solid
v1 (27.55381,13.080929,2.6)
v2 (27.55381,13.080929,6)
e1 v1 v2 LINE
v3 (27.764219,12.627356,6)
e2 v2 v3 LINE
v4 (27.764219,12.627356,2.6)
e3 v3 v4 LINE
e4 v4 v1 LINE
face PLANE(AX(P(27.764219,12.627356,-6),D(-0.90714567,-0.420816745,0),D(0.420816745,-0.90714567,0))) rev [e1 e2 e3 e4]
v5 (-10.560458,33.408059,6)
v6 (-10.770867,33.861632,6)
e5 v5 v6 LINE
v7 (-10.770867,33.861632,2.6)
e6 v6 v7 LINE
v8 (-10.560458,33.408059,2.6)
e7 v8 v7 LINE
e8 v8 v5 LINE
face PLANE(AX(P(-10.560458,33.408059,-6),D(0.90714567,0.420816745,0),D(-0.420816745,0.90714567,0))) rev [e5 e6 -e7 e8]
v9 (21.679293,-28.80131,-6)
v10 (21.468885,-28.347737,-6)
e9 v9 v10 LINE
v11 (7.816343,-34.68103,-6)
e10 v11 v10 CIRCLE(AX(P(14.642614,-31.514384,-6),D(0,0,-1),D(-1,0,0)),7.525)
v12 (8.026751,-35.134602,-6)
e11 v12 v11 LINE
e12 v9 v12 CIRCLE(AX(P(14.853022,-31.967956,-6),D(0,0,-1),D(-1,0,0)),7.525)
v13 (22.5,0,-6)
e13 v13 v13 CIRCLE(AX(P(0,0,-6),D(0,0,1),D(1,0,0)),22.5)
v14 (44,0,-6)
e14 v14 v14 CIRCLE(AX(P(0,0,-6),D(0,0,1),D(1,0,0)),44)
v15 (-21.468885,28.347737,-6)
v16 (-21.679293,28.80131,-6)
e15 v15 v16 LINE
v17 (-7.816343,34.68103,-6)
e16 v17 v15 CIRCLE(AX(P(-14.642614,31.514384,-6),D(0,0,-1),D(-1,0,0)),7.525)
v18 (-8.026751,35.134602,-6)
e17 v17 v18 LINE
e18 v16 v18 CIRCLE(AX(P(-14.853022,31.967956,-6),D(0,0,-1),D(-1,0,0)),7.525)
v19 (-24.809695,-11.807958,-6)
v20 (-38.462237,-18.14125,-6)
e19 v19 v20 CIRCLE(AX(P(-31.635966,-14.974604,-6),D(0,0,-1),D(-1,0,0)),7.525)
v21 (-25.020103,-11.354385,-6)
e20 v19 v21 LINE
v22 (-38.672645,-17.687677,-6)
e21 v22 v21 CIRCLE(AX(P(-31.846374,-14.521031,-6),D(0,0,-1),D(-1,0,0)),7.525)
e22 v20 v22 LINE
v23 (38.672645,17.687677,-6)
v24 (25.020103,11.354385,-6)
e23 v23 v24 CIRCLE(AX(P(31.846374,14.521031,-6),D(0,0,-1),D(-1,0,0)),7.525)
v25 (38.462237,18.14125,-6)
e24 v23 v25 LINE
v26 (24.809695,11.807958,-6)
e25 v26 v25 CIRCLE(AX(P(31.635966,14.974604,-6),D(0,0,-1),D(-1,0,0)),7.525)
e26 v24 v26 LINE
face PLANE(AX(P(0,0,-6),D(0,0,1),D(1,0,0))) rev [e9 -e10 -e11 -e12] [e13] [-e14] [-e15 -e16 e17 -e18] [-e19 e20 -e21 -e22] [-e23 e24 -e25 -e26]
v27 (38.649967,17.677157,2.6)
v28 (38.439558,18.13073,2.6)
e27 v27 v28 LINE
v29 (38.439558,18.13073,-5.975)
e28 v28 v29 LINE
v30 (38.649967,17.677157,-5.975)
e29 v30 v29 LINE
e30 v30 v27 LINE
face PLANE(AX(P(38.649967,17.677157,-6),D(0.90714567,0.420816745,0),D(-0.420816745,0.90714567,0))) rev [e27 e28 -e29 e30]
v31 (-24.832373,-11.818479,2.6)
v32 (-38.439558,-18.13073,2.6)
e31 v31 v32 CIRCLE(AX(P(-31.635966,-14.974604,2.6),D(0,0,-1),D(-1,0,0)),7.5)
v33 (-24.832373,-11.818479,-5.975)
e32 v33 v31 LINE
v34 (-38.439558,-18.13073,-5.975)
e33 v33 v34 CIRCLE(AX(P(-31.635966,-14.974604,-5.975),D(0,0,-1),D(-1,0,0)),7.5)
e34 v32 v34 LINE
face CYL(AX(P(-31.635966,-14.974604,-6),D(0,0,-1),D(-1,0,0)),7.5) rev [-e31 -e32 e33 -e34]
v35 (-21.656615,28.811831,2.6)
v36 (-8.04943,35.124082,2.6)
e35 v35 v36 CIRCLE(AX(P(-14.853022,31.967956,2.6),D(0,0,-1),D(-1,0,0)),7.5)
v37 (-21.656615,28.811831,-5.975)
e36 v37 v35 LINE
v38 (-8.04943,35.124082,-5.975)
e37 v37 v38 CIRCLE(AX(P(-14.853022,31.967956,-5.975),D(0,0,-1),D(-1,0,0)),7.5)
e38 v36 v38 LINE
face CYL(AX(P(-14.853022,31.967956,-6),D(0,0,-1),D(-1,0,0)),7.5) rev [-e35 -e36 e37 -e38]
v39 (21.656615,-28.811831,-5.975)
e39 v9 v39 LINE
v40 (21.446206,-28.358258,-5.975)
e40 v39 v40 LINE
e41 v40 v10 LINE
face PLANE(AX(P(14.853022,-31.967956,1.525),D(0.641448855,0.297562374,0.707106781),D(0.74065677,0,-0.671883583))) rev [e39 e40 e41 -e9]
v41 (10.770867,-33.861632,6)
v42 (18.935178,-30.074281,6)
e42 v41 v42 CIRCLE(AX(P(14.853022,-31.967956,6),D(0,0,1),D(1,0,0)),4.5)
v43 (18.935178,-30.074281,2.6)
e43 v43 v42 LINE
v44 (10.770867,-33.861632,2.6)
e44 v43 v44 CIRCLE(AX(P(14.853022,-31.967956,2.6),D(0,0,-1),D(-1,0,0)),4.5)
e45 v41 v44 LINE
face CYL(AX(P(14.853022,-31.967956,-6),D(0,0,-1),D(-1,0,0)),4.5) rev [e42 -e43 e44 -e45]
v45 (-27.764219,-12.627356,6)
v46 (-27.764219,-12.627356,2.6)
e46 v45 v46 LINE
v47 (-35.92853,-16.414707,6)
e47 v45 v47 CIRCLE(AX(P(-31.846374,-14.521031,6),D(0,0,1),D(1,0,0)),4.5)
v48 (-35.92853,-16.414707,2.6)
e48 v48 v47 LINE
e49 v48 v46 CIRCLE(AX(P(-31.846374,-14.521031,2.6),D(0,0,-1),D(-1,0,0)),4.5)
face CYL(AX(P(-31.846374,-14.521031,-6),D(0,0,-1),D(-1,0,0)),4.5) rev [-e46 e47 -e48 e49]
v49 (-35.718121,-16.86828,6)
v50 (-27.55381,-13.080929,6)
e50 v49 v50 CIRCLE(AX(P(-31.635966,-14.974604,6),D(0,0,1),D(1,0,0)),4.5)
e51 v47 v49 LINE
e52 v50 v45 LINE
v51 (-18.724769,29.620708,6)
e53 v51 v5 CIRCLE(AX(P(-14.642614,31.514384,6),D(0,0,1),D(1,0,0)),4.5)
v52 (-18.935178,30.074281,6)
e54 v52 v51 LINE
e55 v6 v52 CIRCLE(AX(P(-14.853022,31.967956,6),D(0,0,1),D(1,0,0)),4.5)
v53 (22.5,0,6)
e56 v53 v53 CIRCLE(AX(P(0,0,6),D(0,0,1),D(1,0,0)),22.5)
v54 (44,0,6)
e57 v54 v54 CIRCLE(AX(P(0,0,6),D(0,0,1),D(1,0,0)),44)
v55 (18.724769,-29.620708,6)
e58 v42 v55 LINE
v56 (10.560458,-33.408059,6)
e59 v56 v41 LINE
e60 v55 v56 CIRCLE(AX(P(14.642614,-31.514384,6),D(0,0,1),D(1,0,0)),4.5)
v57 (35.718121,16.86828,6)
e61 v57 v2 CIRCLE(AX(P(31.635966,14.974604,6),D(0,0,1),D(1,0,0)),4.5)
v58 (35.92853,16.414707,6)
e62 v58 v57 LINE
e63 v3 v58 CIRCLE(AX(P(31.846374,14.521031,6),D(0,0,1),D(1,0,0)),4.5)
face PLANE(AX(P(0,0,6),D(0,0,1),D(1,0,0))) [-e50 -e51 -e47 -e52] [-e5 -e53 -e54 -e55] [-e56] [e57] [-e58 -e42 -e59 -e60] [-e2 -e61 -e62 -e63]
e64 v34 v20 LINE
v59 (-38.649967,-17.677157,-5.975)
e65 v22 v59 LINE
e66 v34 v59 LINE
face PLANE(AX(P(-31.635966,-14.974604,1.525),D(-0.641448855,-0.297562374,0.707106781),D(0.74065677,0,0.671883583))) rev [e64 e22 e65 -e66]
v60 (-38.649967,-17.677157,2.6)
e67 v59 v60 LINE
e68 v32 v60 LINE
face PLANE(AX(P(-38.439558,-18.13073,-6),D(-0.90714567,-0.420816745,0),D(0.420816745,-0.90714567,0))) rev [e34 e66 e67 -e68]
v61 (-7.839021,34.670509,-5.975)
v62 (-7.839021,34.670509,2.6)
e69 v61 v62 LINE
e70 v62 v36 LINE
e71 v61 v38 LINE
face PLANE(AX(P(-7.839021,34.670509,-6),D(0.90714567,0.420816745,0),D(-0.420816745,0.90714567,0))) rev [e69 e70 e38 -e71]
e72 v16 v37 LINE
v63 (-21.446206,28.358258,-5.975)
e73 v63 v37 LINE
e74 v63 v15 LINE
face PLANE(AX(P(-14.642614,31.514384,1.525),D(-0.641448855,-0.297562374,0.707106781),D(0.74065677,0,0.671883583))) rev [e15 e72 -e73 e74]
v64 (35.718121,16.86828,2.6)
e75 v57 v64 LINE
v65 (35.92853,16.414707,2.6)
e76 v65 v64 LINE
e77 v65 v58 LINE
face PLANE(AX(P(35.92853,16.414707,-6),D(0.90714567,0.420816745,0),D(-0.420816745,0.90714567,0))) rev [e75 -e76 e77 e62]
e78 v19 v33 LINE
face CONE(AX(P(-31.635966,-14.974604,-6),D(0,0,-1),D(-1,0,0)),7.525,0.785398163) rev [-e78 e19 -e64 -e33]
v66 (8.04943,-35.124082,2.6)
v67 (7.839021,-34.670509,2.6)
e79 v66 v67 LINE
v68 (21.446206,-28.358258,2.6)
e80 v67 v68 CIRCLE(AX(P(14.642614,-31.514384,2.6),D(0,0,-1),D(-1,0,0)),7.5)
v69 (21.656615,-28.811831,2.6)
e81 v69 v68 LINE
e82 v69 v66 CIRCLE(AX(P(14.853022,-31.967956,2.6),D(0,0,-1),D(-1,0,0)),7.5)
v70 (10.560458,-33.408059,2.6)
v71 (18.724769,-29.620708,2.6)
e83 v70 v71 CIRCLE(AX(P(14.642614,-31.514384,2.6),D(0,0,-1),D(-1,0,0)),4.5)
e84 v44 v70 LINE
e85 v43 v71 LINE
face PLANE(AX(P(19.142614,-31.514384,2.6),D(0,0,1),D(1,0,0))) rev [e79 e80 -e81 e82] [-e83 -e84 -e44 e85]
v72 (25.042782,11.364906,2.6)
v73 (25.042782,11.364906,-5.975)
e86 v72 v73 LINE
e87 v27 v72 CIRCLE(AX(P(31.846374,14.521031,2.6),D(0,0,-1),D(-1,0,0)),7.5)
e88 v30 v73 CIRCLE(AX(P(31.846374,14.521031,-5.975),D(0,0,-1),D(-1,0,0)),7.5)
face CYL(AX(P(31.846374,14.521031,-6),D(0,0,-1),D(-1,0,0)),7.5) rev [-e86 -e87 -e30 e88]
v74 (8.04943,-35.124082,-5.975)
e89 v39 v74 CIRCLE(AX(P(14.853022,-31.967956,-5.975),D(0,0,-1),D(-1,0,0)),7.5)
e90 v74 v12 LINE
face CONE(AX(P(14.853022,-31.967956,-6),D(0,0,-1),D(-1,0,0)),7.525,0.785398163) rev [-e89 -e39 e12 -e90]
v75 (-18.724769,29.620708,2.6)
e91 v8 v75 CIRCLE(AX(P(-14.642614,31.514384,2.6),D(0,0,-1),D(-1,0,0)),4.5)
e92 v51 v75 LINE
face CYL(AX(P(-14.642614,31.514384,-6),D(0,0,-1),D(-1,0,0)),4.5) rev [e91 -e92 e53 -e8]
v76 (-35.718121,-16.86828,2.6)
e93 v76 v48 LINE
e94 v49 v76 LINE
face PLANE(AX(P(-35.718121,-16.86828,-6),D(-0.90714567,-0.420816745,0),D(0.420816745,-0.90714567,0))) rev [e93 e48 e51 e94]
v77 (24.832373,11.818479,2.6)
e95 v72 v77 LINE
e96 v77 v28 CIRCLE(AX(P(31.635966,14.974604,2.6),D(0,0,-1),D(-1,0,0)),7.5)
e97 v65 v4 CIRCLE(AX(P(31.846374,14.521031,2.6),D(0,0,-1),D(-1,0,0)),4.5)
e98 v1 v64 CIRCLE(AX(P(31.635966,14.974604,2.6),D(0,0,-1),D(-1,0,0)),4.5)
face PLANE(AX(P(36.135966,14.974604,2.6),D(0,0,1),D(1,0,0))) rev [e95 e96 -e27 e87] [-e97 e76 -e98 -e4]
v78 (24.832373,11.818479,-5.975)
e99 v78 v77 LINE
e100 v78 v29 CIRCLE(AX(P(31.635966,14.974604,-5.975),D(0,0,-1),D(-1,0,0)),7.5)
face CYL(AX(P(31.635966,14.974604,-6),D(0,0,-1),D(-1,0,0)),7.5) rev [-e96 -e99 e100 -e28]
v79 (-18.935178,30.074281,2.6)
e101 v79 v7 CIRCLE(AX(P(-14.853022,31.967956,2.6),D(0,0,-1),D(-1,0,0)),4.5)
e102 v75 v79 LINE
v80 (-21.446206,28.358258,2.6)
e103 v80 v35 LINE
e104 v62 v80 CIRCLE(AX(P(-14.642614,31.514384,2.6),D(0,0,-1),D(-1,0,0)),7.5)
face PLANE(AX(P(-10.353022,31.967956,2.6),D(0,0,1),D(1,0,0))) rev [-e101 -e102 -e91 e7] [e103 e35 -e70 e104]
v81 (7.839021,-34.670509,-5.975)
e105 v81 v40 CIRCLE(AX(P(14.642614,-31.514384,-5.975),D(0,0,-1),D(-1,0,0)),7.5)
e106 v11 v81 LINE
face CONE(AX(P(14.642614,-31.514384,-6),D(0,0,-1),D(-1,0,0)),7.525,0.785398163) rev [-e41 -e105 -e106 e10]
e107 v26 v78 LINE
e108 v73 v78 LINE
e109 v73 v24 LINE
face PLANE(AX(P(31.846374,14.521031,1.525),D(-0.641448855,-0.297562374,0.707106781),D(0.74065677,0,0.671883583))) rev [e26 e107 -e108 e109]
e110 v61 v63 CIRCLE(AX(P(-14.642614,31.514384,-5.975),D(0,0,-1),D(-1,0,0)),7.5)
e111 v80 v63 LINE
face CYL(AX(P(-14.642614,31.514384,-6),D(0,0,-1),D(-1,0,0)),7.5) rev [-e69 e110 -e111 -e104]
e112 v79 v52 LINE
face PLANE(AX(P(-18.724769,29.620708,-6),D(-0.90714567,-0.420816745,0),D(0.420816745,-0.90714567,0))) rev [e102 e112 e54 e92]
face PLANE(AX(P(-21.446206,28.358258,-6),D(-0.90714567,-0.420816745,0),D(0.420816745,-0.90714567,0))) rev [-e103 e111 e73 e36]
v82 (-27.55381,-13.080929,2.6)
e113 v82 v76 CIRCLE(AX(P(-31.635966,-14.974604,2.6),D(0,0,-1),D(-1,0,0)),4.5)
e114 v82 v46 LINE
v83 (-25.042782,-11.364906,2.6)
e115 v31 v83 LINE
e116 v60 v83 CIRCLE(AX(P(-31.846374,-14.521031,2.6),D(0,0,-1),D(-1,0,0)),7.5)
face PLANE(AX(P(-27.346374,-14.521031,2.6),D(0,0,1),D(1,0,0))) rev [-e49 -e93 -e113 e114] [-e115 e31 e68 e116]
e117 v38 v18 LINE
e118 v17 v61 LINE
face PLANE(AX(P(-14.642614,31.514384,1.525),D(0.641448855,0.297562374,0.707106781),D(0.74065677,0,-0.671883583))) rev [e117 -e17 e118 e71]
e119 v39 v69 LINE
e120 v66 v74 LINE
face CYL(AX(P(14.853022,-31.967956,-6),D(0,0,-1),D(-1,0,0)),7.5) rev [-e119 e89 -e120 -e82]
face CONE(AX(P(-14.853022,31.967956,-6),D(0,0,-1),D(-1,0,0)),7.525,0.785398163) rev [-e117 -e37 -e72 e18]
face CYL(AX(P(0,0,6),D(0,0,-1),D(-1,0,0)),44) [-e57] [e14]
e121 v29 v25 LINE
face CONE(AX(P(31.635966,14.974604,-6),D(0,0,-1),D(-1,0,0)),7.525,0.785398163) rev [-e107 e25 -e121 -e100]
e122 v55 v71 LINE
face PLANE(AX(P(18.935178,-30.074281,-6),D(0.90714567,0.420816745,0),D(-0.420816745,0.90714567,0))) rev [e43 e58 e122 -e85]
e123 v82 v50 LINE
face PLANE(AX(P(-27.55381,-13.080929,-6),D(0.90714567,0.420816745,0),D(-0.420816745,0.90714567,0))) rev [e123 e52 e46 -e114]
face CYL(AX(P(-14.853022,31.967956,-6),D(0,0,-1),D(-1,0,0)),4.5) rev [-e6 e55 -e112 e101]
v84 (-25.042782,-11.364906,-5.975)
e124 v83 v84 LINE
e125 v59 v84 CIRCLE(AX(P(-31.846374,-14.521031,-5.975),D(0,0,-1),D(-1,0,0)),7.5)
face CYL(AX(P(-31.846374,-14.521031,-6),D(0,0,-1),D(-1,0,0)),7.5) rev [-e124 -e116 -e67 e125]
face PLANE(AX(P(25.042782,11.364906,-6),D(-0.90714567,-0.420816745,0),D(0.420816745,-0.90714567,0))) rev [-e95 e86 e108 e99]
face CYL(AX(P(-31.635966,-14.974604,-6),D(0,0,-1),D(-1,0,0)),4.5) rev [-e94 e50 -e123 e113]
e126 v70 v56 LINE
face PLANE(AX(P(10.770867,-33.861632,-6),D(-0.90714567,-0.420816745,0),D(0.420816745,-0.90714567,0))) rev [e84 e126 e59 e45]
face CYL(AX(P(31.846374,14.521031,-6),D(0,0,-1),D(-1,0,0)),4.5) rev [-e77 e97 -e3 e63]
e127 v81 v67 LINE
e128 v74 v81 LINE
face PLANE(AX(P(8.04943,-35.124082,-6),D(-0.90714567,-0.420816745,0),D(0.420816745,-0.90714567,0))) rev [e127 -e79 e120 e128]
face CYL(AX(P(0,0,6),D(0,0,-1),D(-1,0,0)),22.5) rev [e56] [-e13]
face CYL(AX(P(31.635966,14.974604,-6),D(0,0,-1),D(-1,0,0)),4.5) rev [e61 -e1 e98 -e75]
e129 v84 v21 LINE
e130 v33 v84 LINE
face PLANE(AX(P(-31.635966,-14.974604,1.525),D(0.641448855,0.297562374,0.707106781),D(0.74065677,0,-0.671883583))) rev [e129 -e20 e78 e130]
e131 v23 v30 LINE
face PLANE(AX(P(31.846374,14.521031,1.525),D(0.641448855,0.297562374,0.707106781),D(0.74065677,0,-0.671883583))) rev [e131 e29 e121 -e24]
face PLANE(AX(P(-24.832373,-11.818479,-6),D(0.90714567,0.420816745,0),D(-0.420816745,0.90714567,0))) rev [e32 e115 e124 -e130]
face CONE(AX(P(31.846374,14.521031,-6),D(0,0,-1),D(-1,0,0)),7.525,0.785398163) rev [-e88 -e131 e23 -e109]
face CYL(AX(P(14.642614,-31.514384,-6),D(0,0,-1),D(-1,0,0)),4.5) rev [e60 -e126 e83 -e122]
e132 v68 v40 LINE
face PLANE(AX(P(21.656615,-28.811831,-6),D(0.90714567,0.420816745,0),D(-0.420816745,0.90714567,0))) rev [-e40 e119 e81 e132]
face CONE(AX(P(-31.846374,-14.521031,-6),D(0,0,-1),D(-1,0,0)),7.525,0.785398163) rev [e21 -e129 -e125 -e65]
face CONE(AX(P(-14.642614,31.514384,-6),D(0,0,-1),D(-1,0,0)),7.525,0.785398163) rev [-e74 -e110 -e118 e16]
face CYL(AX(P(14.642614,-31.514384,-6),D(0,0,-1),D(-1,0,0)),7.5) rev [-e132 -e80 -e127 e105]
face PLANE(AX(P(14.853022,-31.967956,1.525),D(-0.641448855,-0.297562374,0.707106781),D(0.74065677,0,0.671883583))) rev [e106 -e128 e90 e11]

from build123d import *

# Parameters (mm, degrees)
SKETCH1_R                                      = 44
SKETCH1_R_2                                    = 22.5
BOSS_EXTRUDE1_DEPTH                            = 6
CBORE_START                                    = -6
CBORE_SLOT_FOR_M8_HEX_SOCKET_HEAD_CAP_SC_DEPTH = 8.6
CBORE_START_2                                  = 2.6
CBORE_SLOT_FOR_M8_HEX_SOCKET_HEAD_CA_3_DEPTH   = 3.4


with BuildPart() as part:
    # Sketch1 → Boss-Extrude1 (new, symmetric)
    with BuildSketch(Plane.XY):
        Circle(SKETCH1_R)
        Circle(SKETCH1_R_2, mode=Mode.SUBTRACT)
    extrude(amount=BOSS_EXTRUDE1_DEPTH, both=True)

    # CBORE SLOT for M8 Hex Socket Head Cap Screw1: read off the stored shape, not the designer's step
    # CBORE SLOT for M8 Hex Socket Head Ca 2 → CBORE SLOT for M8 Hex Socket Head Cap Screw1 (cut)
    with BuildSketch(Plane.XY.offset(CBORE_START)):
        with BuildLine():
            ThreePointArc((38.439558263, 18.130729877), (28.479840149, 21.778196819), (24.832373207, 11.818478705))
            Line((24.832373207, 11.818478705), (25.04278158, 11.36490587))
            ThreePointArc((25.04278158, 11.36490587), (35.002499693, 7.717438928), (38.649966636, 17.677157041))
            Line((38.649966636, 17.677157041), (38.439558263, 18.130729877))
        make_face()
        with BuildLine():
            ThreePointArc((21.446206215, -28.358257918), (11.486488101, -24.710790976), (7.839021159, -34.67050909))
            Line((7.839021159, -34.67050909), (8.049429531, -35.124081925))
            ThreePointArc((8.049429531, -35.124081925), (18.009147645, -38.771548867), (21.656614587, -28.811830753))
            Line((21.656614587, -28.811830753), (21.446206215, -28.358257918))
        make_face()
        with BuildLine():
            ThreePointArc((-25.04278158, -11.36490587), (-35.002499693, -7.717438928), (-38.649966636, -17.677157041))
            Line((-38.649966636, -17.677157041), (-38.439558263, -18.130729877))
            ThreePointArc((-38.439558263, -18.130729877), (-28.479840149, -21.778196819), (-24.832373207, -11.818478705))
            Line((-24.832373207, -11.818478705), (-25.04278158, -11.36490587))
        make_face()
        with BuildLine():
            ThreePointArc((-8.049429531, 35.124081925), (-18.009147645, 38.771548867), (-21.656614587, 28.811830753))
            Line((-21.656614587, 28.811830753), (-21.446206215, 28.358257918))
            ThreePointArc((-21.446206215, 28.358257918), (-11.486488101, 24.710790976), (-7.839021159, 34.67050909))
            Line((-7.839021159, 34.67050909), (-8.049429531, 35.124081925))
        make_face()
    extrude(amount=CBORE_SLOT_FOR_M8_HEX_SOCKET_HEAD_CAP_SC_DEPTH, mode=Mode.SUBTRACT)

    # CBORE SLOT for M8 Hex Socket Head Ca 3 o → CBORE SLOT for M8 Hex Socket Head Ca 3 (cut)
    with BuildSketch(Plane.XY.offset(CBORE_START_2)):
        with BuildLine():
            ThreePointArc((35.718121252, 16.868279642), (29.742290383, 19.056759808), (27.553810218, 13.080928939))
            Line((27.553810218, 13.080928939), (27.764218591, 12.627356104))
            ThreePointArc((27.764218591, 12.627356104), (33.740049459, 10.438875939), (35.928529624, 16.414706807))
            Line((35.928529624, 16.414706807), (35.718121252, 16.868279642))
        make_face()
        with BuildLine():
            ThreePointArc((18.724769204, -29.620708152), (12.748938336, -27.432227987), (10.56045817, -33.408058855))
            Line((10.56045817, -33.408058855), (10.770866543, -33.86163169))
            ThreePointArc((10.770866543, -33.86163169), (16.746697411, -36.050111856), (18.935177576, -30.074280987))
            Line((18.935177576, -30.074280987), (18.724769204, -29.620708152))
        make_face()
        with BuildLine():
            ThreePointArc((-27.764218591, -12.627356104), (-33.740049459, -10.438875939), (-35.928529624, -16.414706807))
            Line((-35.928529624, -16.414706807), (-35.718121252, -16.868279642))
            ThreePointArc((-35.718121252, -16.868279642), (-29.742290383, -19.056759808), (-27.553810218, -13.080928939))
            Line((-27.553810218, -13.080928939), (-27.764218591, -12.627356104))
        make_face()
        with BuildLine():
            ThreePointArc((-10.770866543, 33.86163169), (-16.746697411, 36.050111856), (-18.935177576, 30.074280987))
            Line((-18.935177576, 30.074280987), (-18.724769204, 29.620708152))
            ThreePointArc((-18.724769204, 29.620708152), (-12.748938336, 27.432227987), (-10.56045817, 33.408058855))
            Line((-10.56045817, 33.408058855), (-10.770866543, 33.86163169))
        make_face()
    extrude(amount=CBORE_SLOT_FOR_M8_HEX_SOCKET_HEAD_CA_3_DEPTH, mode=Mode.SUBTRACT)

    # CBORE SLOT for M8 Hex Socket Head Ca 4: loft between two sections, ruled curve by curve
    cbore_slot_for_m8_hex_socket_head_ca_4_from = [
        Edge.make_three_point_arc((24.832373207, 11.818478705, -5.975), (24.593381518, 17.5537529, -5.975), (28.479840149, 21.778196819, -5.975)),
        Edge.make_three_point_arc((28.479840149, 21.778196819, -5.975), (34.215114344, 22.017188508, -5.975), (38.439558263, 18.130729877, -5.975)),
        Edge.make_three_point_arc((38.649966636, 17.677157041, -5.975), (38.888958324, 11.941882847, -5.975), (35.002499693, 7.717438928, -5.975)),
        Edge.make_three_point_arc((35.002499693, 7.717438928, -5.975), (29.267225499, 7.478447239, -5.975), (25.04278158, 11.36490587, -5.975)),
        Edge.make_line((38.439558263, 18.130729877, -5.975), (38.649966636, 17.677157041, -5.975)),
        Edge.make_line((24.832373207, 11.818478705, -5.975), (25.04278158, 11.36490587, -5.975)),
    ]
    cbore_slot_for_m8_hex_socket_head_ca_4_to = [
        Edge.make_three_point_arc((24.809694565, 11.807958286, -6), (24.569906238, 17.562350062, -6), (28.469319731, 21.800875461, -6)),
        Edge.make_three_point_arc((28.469319731, 21.800875461, -6), (34.223711506, 22.040663789, -6), (38.462236905, 18.141250295, -6)),
        Edge.make_three_point_arc((38.672645277, 17.68767746, -6), (38.912433605, 11.933285685, -6), (35.013020112, 7.694760286, -6)),
        Edge.make_three_point_arc((35.013020112, 7.694760286, -6), (29.258628337, 7.454971958, -6), (25.020102938, 11.354385451, -6)),
        Edge.make_line((38.462236905, 18.141250295, -6), (38.672645277, 17.68767746, -6)),
        Edge.make_line((24.809694565, 11.807958286, -6), (25.020102938, 11.354385451, -6)),
    ]
    cbore_slot_for_m8_hex_socket_head_ca_4 = Solid(Shell([*[Face.make_surface_from_curves(cbore_slot_for_m8_hex_socket_head_ca_4_from[k], cbore_slot_for_m8_hex_socket_head_ca_4_to[k]) for k in range(6)], Face(Wire(cbore_slot_for_m8_hex_socket_head_ca_4_from)), Face(Wire(cbore_slot_for_m8_hex_socket_head_ca_4_to))]))
    add(cbore_slot_for_m8_hex_socket_head_ca_4, mode=Mode.SUBTRACT)

    # CBORE SLOT for M8 Hex Socket Head Ca 5: loft between two sections, ruled curve by curve
    cbore_slot_for_m8_hex_socket_head_ca_5_from = [
        Edge.make_three_point_arc((7.839021159, -34.67050909, -5.975), (7.60002947, -28.935234895, -5.975), (11.486488101, -24.710790976, -5.975)),
        Edge.make_three_point_arc((11.486488101, -24.710790976, -5.975), (17.221762296, -24.471799287, -5.975), (21.446206215, -28.358257918, -5.975)),
        Edge.make_three_point_arc((21.656614587, -28.811830753, -5.975), (21.895606276, -34.547104948, -5.975), (18.009147645, -38.771548867, -5.975)),
        Edge.make_three_point_arc((18.009147645, -38.771548867, -5.975), (12.27387345, -39.010540556, -5.975), (8.049429531, -35.124081925, -5.975)),
        Edge.make_line((21.446206215, -28.358257918, -5.975), (21.656614587, -28.811830753, -5.975)),
        Edge.make_line((7.839021159, -34.67050909, -5.975), (8.049429531, -35.124081925, -5.975)),
    ]
    cbore_slot_for_m8_hex_socket_head_ca_5_to = [
        Edge.make_three_point_arc((7.816342517, -34.681029508, -6), (7.576554189, -28.926637733, -6), (11.475967683, -24.688112334, -6)),
        Edge.make_three_point_arc((11.475967683, -24.688112334, -6), (17.230359458, -24.448324006, -6), (21.468884857, -28.347737499, -6)),
        Edge.make_three_point_arc((21.679293229, -28.801310335, -6), (21.919081557, -34.55570211, -6), (18.019668064, -38.794227509, -6)),
        Edge.make_three_point_arc((18.019668064, -38.794227509, -6), (12.265276288, -39.034015837, -6), (8.02675089, -35.134602343, -6)),
        Edge.make_line((21.468884857, -28.347737499, -6), (21.679293229, -28.801310335, -6)),
        Edge.make_line((7.816342517, -34.681029508, -6), (8.02675089, -35.134602343, -6)),
    ]
    cbore_slot_for_m8_hex_socket_head_ca_5 = Solid(Shell([*[Face.make_surface_from_curves(cbore_slot_for_m8_hex_socket_head_ca_5_from[k], cbore_slot_for_m8_hex_socket_head_ca_5_to[k]) for k in range(6)], Face(Wire(cbore_slot_for_m8_hex_socket_head_ca_5_from)), Face(Wire(cbore_slot_for_m8_hex_socket_head_ca_5_to))]))
    add(cbore_slot_for_m8_hex_socket_head_ca_5, mode=Mode.SUBTRACT)

    # CBORE SLOT for M8 Hex Socket Head Ca 6: loft between two sections, ruled curve by curve
    cbore_slot_for_m8_hex_socket_head_ca_6_from = [
        Edge.make_three_point_arc((-38.649966636, -17.677157041, -5.975), (-38.888958324, -11.941882847, -5.975), (-35.002499693, -7.717438928, -5.975)),
        Edge.make_three_point_arc((-35.002499693, -7.717438928, -5.975), (-29.267225499, -7.478447239, -5.975), (-25.04278158, -11.36490587, -5.975)),
        Edge.make_three_point_arc((-24.832373207, -11.818478705, -5.975), (-24.593381518, -17.5537529, -5.975), (-28.479840149, -21.778196819, -5.975)),
        Edge.make_three_point_arc((-28.479840149, -21.778196819, -5.975), (-34.215114344, -22.017188508, -5.975), (-38.439558263, -18.130729877, -5.975)),
        Edge.make_line((-25.04278158, -11.36490587, -5.975), (-24.832373207, -11.818478705, -5.975)),
        Edge.make_line((-38.649966636, -17.677157041, -5.975), (-38.439558263, -18.130729877, -5.975)),
    ]
    cbore_slot_for_m8_hex_socket_head_ca_6_to = [
        Edge.make_three_point_arc((-38.672645277, -17.68767746, -6), (-38.912433605, -11.933285685, -6), (-35.013020112, -7.694760286, -6)),
        Edge.make_three_point_arc((-35.013020112, -7.694760286, -6), (-29.258628337, -7.454971958, -6), (-25.020102938, -11.354385451, -6)),
        Edge.make_three_point_arc((-24.809694565, -11.807958286, -6), (-24.569906238, -17.562350062, -6), (-28.469319731, -21.800875461, -6)),
        Edge.make_three_point_arc((-28.469319731, -21.800875461, -6), (-34.223711506, -22.040663789, -6), (-38.462236905, -18.141250295, -6)),
        Edge.make_line((-25.020102938, -11.354385451, -6), (-24.809694565, -11.807958286, -6)),
        Edge.make_line((-38.672645277, -17.68767746, -6), (-38.462236905, -18.141250295, -6)),
    ]
    cbore_slot_for_m8_hex_socket_head_ca_6 = Solid(Shell([*[Face.make_surface_from_curves(cbore_slot_for_m8_hex_socket_head_ca_6_from[k], cbore_slot_for_m8_hex_socket_head_ca_6_to[k]) for k in range(6)], Face(Wire(cbore_slot_for_m8_hex_socket_head_ca_6_from)), Face(Wire(cbore_slot_for_m8_hex_socket_head_ca_6_to))]))
    add(cbore_slot_for_m8_hex_socket_head_ca_6, mode=Mode.SUBTRACT)

    # CBORE SLOT for M8 Hex Socket Head Ca 7: loft between two sections, ruled curve by curve
    cbore_slot_for_m8_hex_socket_head_ca_7_from = [
        Edge.make_three_point_arc((-21.656614587, 28.811830753, -5.975), (-21.895606276, 34.547104948, -5.975), (-18.009147645, 38.771548867, -5.975)),
        Edge.make_three_point_arc((-18.009147645, 38.771548867, -5.975), (-12.27387345, 39.010540556, -5.975), (-8.049429531, 35.124081925, -5.975)),
        Edge.make_three_point_arc((-7.839021159, 34.67050909, -5.975), (-7.60002947, 28.935234895, -5.975), (-11.486488101, 24.710790976, -5.975)),
        Edge.make_three_point_arc((-11.486488101, 24.710790976, -5.975), (-17.221762296, 24.471799287, -5.975), (-21.446206215, 28.358257918, -5.975)),
        Edge.make_line((-8.049429531, 35.124081925, -5.975), (-7.839021159, 34.67050909, -5.975)),
        Edge.make_line((-21.656614587, 28.811830753, -5.975), (-21.446206215, 28.358257918, -5.975)),
    ]
    cbore_slot_for_m8_hex_socket_head_ca_7_to = [
        Edge.make_three_point_arc((-21.679293229, 28.801310335, -6), (-21.919081557, 34.55570211, -6), (-18.019668064, 38.794227509, -6)),
        Edge.make_three_point_arc((-18.019668064, 38.794227509, -6), (-12.265276288, 39.034015837, -6), (-8.02675089, 35.134602343, -6)),
        Edge.make_three_point_arc((-7.816342517, 34.681029508, -6), (-7.576554189, 28.926637733, -6), (-11.475967683, 24.688112334, -6)),
        Edge.make_three_point_arc((-11.475967683, 24.688112334, -6), (-17.230359458, 24.448324006, -6), (-21.468884857, 28.347737499, -6)),
        Edge.make_line((-8.02675089, 35.134602343, -6), (-7.816342517, 34.681029508, -6)),
        Edge.make_line((-21.679293229, 28.801310335, -6), (-21.468884857, 28.347737499, -6)),
    ]
    cbore_slot_for_m8_hex_socket_head_ca_7 = Solid(Shell([*[Face.make_surface_from_curves(cbore_slot_for_m8_hex_socket_head_ca_7_from[k], cbore_slot_for_m8_hex_socket_head_ca_7_to[k]) for k in range(6)], Face(Wire(cbore_slot_for_m8_hex_socket_head_ca_7_from)), Face(Wire(cbore_slot_for_m8_hex_socket_head_ca_7_to))]))
    add(cbore_slot_for_m8_hex_socket_head_ca_7, mode=Mode.SUBTRACT)


solid = part.part
